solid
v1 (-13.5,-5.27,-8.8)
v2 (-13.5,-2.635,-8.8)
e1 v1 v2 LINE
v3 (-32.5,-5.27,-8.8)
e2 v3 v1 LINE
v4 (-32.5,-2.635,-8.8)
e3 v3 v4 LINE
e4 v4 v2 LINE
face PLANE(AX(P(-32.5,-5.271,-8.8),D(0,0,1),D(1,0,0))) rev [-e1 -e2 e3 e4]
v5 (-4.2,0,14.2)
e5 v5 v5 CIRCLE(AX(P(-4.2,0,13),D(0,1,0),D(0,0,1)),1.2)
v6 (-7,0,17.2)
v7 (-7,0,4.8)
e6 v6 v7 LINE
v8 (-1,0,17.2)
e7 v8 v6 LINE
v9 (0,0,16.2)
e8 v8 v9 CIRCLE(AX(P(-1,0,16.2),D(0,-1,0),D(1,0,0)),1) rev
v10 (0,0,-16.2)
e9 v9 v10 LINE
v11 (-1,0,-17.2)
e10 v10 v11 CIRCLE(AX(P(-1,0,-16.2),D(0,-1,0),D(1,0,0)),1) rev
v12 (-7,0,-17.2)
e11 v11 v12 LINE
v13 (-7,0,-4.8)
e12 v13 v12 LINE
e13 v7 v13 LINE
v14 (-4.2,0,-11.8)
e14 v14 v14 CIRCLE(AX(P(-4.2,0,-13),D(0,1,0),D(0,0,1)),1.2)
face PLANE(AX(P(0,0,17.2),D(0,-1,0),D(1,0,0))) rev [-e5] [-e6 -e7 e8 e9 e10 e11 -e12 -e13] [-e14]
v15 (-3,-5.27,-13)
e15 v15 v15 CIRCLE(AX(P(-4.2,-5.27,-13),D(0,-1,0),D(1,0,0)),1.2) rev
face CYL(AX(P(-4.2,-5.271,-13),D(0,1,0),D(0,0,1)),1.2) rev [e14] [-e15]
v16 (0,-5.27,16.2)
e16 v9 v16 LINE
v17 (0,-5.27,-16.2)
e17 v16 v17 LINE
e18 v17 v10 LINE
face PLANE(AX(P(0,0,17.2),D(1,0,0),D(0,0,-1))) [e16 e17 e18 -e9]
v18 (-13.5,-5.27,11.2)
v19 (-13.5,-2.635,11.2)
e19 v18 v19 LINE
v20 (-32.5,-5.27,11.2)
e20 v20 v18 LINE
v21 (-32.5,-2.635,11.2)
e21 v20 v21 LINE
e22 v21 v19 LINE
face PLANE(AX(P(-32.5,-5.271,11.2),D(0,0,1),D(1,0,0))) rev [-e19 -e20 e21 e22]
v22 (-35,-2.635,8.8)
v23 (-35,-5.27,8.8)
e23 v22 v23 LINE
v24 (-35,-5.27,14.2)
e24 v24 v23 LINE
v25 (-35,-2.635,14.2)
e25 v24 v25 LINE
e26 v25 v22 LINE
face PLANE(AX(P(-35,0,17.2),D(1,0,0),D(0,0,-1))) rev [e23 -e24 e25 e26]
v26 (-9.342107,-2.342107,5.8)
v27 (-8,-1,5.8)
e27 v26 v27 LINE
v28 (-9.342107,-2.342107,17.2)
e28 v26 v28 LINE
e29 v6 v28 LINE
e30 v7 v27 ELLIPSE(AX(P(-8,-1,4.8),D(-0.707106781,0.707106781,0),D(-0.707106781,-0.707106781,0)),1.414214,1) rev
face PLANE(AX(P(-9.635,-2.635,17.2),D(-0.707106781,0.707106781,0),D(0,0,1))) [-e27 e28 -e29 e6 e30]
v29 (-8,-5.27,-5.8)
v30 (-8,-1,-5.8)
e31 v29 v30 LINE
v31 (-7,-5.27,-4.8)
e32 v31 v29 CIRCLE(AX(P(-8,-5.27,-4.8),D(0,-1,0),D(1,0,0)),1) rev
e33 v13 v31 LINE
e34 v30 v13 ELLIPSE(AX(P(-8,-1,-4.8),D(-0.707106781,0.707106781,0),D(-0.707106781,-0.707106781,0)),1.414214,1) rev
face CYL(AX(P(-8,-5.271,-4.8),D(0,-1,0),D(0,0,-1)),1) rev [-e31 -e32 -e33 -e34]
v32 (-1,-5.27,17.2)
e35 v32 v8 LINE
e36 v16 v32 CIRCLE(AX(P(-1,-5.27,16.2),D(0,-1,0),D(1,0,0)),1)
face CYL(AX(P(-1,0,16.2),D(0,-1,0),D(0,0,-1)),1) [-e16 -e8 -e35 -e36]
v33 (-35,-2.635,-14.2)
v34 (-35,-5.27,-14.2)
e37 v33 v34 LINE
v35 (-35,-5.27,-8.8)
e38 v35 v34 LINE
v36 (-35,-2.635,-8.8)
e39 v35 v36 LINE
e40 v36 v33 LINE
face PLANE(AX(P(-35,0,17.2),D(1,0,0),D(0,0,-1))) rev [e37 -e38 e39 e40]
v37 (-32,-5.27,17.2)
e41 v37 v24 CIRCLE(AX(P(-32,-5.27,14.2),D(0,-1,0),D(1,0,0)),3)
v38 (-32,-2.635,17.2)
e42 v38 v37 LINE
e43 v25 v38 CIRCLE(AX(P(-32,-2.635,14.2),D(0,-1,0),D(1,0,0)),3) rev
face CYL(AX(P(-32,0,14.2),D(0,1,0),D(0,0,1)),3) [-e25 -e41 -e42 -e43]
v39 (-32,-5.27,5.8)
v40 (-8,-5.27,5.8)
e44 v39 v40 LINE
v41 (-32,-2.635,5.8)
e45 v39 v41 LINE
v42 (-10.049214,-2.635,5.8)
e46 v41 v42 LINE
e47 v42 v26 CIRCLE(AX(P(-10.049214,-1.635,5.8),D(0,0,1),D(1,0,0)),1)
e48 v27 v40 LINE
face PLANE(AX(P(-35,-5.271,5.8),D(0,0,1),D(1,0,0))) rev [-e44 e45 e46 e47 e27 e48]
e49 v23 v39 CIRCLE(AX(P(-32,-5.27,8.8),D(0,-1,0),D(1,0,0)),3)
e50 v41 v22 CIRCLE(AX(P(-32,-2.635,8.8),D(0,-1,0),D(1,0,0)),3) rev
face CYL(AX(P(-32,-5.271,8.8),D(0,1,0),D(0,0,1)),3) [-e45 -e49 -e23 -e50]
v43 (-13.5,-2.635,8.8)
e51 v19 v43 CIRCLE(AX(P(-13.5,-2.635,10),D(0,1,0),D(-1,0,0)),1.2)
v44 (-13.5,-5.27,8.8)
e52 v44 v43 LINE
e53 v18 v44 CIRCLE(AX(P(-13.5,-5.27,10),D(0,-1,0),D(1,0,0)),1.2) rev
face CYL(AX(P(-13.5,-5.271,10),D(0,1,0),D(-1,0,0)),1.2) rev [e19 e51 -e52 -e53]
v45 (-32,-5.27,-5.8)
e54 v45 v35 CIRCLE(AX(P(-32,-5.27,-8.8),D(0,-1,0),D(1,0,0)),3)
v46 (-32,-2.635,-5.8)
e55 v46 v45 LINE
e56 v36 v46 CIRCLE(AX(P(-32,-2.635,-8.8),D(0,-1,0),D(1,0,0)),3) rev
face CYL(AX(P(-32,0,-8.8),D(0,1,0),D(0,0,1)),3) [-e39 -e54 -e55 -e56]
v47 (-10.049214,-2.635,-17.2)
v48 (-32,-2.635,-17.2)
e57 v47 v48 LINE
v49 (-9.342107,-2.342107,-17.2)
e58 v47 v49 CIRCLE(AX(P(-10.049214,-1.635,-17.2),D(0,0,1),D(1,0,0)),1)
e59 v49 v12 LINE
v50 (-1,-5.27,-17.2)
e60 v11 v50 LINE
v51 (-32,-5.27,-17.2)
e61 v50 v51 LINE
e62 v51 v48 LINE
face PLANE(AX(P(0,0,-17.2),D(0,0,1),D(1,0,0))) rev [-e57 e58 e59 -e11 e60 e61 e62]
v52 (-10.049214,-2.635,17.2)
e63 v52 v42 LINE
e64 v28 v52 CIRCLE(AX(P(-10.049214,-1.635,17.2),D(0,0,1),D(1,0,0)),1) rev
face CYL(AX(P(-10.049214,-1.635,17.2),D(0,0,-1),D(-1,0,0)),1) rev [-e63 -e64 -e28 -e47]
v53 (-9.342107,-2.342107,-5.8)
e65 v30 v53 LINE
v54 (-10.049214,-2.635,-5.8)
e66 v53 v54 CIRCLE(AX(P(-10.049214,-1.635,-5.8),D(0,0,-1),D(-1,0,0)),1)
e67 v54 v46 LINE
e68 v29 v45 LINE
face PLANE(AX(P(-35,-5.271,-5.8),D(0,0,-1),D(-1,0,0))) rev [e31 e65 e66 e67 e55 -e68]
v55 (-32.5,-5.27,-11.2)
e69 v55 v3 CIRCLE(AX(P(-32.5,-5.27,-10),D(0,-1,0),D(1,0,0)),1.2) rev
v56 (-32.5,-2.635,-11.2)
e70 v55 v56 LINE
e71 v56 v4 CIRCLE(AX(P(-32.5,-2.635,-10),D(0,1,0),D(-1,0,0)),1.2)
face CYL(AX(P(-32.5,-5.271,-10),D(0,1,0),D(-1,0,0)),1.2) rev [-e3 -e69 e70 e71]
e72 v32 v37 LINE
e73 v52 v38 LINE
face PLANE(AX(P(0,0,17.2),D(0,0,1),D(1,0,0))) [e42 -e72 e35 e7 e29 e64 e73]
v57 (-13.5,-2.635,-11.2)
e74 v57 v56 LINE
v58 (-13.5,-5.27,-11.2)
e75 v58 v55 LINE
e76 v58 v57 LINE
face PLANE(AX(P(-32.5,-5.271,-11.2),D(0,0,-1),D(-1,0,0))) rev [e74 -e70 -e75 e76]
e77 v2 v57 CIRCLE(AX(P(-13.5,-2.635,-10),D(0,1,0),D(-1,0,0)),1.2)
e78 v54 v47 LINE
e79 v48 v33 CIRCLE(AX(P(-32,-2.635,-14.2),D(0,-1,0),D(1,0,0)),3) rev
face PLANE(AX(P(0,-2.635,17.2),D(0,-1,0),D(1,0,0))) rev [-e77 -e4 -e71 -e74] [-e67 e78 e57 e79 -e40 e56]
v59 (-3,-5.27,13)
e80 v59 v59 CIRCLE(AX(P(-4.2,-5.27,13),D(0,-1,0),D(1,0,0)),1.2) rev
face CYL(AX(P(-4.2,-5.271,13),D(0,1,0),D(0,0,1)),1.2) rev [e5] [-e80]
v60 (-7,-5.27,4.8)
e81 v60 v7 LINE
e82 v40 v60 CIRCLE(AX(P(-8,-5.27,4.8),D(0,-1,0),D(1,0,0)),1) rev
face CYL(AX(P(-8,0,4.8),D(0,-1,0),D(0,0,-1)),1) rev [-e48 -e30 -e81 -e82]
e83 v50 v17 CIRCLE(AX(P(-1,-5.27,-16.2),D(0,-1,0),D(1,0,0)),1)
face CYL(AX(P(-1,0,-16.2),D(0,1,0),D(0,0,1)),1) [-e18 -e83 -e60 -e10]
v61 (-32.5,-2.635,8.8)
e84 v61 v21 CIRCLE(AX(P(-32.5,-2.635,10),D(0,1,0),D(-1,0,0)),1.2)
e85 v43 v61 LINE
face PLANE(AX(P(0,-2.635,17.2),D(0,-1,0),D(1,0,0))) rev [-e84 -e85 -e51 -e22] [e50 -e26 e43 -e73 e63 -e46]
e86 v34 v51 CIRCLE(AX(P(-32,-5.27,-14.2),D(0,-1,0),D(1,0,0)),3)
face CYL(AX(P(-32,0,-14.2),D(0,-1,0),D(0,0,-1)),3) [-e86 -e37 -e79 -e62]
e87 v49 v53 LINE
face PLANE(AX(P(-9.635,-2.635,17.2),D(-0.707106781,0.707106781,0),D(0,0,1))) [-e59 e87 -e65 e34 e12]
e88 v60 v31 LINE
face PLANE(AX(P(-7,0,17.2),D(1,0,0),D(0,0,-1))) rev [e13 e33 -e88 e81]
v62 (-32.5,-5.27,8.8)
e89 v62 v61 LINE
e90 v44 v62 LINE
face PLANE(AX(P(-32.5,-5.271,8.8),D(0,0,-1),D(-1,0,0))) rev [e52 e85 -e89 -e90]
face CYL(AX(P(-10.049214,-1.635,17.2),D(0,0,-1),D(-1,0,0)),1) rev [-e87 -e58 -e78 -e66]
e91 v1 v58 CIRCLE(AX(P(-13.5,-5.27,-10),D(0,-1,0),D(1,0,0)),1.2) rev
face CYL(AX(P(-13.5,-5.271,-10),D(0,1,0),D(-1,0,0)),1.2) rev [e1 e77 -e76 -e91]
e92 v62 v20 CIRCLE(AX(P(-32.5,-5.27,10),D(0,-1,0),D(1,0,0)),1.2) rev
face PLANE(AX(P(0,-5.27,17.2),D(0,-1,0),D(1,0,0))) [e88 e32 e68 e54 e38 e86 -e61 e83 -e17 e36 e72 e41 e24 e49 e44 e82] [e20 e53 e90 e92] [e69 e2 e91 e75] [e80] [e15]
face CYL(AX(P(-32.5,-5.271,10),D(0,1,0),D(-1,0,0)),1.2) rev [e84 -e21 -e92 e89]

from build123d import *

# Parameters (mm, degrees)
SKETCH1_W           = 7
SKETCH1_H           = 2.635
BOSS_EXTRUDE1_DEPTH = 17.2
CUT_EXTRUDE1_REACH  = 41.352
SKETCH2_R           = 1.2
CUT_EXTRUDE2_REACH  = 41.087
SKETCH3_W           = 28
SKETCH3_H           = 11.6
CHAMFER1_SIZE       = 2.635
FILLET2_R           = 1
FILLET3_R           = 3
FILLET4_R           = 1


with BuildPart() as part:
    # Sketch1 → Boss-Extrude1 (new, symmetric)
    with BuildSketch(Plane.XY):
        Polygon((0, -5.27), (0, -2.635), (-7, -2.635), (-35, -2.635), (-35, -5.27), align=None)
        with Locations((-3.5, -1.3175)):
            Rectangle(SKETCH1_W, SKETCH1_H)
    extrude(amount=BOSS_EXTRUDE1_DEPTH, both=True)

    # Sketch2 → Cut-Extrude1 (cut, up to next)
    with BuildSketch(Plane(origin=(0, 0, 0), x_dir=(1, 0, 0), z_dir=(0, 1, 0)), mode=Mode.PRIVATE) as cut_extrude1_sk1:
        with Locations(Location((-4.2, 13, 0), (0, 0, 270))):
            Circle(SKETCH2_R)
    cut_extrude1_tool1 = extrude(cut_extrude1_sk1.sketch, amount=-CUT_EXTRUDE1_REACH, mode=Mode.PRIVATE) & part.part
    # Sketch2 → Cut-Extrude1 (cut, up to next)
    with BuildSketch(Plane(origin=(0, 0, 0), x_dir=(1, 0, 0), z_dir=(0, 1, 0)), mode=Mode.PRIVATE) as cut_extrude1_sk2:
        with Locations(Location((-4.2, -13, 0), (0, 0, 270))):
            Circle(SKETCH2_R)
    cut_extrude1_tool2 = extrude(cut_extrude1_sk2.sketch, amount=-CUT_EXTRUDE1_REACH, mode=Mode.PRIVATE) & part.part
    add(cut_extrude1_tool1.solids().sort_by_distance((-4.2, 0, -13))[0], mode=Mode.SUBTRACT)
    add(cut_extrude1_tool2.solids().sort_by_distance((-4.2, 0, 13))[0], mode=Mode.SUBTRACT)

    # Sketch3 → Cut-Extrude2 (cut, up to next)
    with BuildSketch(Plane(origin=(0, -2.635, 0), x_dir=(1, 0, 0), z_dir=(0, 1, 0)), mode=Mode.PRIVATE) as cut_extrude2_sk1:
        with Locations((-21, 0)):
            Rectangle(SKETCH3_W, SKETCH3_H)
    cut_extrude2_tool1 = extrude(cut_extrude2_sk1.sketch, amount=-CUT_EXTRUDE2_REACH, mode=Mode.PRIVATE) & part.part
    # Sketch3 → Cut-Extrude2 (cut, up to next)
    with BuildSketch(Plane(origin=(0, -2.635, 0), x_dir=(1, 0, 0), z_dir=(0, 1, 0)), mode=Mode.PRIVATE) as cut_extrude2_sk2:
        with BuildLine():
            Line((-32.5, 11.2), (-13.5, 11.2))
            ThreePointArc((-13.5, 11.2), (-12.3, 10), (-13.5, 8.8))
            Line((-13.5, 8.8), (-32.5, 8.8))
            ThreePointArc((-32.5, 8.8), (-33.7, 10), (-32.5, 11.2))
        make_face()
    cut_extrude2_tool2 = extrude(cut_extrude2_sk2.sketch, amount=-CUT_EXTRUDE2_REACH, mode=Mode.PRIVATE) & part.part
    # Sketch3 → Cut-Extrude2 (cut, up to next)
    with BuildSketch(Plane(origin=(0, -2.635, 0), x_dir=(1, 0, 0), z_dir=(0, 1, 0)), mode=Mode.PRIVATE) as cut_extrude2_sk3:
        with BuildLine():
            Line((-32.5, -8.8), (-13.5, -8.8))
            ThreePointArc((-13.5, -8.8), (-12.3, -10), (-13.5, -11.2))
            Line((-13.5, -11.2), (-32.5, -11.2))
            ThreePointArc((-32.5, -11.2), (-33.7, -10), (-32.5, -8.8))
        make_face()
    cut_extrude2_tool3 = extrude(cut_extrude2_sk3.sketch, amount=-CUT_EXTRUDE2_REACH, mode=Mode.PRIVATE) & part.part
    add(cut_extrude2_tool1.solids().sort_by_distance((-21, -2.635, 0))[0], mode=Mode.SUBTRACT)
    add(cut_extrude2_tool2.solids().sort_by_distance((-23, -2.635, -10))[0], mode=Mode.SUBTRACT)
    add(cut_extrude2_tool3.solids().sort_by_distance((-23, -2.635, 10))[0], mode=Mode.SUBTRACT)

    # Chamfer1
    # the kernel refuses this chamfer: 2.635 mm, written as the material it adds along each edge
    with BuildSketch(Plane(origin=(-7, -2.635, 5.8), x_dir=(0.027495876610586358, 0.9996219169112968, 0), z_dir=(0, 0, 1))) as chamfer1_piece_1_section:
        Polygon((CHAMFER1_SIZE * 0.999621916911, CHAMFER1_SIZE * 0.0274958766106), (-CHAMFER1_SIZE * 0.0274958766106, CHAMFER1_SIZE * 0.999621916911), (0, 0), align=None)
    chamfer1_piece_1 = extrude(amount=11.4, mode=Mode.PRIVATE)
    chamfer1_piece_1 = split(chamfer1_piece_1, bisect_by=Plane(origin=(-7.870614947, 0, 11.5), z_dir=(0, -1, 0)), keep=Keep.TOP, mode=Mode.PRIVATE)
    add(chamfer1_piece_1)
    with BuildSketch(Plane(origin=(-7, -2.635, -17.2), x_dir=(0.027495876610586358, 0.9996219169112968, 0), z_dir=(0, 0, 1))) as chamfer1_piece_2_section:
        Polygon((CHAMFER1_SIZE * 0.999621916911, CHAMFER1_SIZE * 0.0274958766106), (-CHAMFER1_SIZE * 0.0274958766106, CHAMFER1_SIZE * 0.999621916911), (0, 0), align=None)
    chamfer1_piece_2 = extrude(amount=11.4, mode=Mode.PRIVATE)
    chamfer1_piece_2 = split(chamfer1_piece_2, bisect_by=Plane(origin=(-7.870614947, 0, -11.5), z_dir=(0, -1, 0)), keep=Keep.TOP, mode=Mode.PRIVATE)
    add(chamfer1_piece_2)

    # Fillet2
    fillet2_edges = [part.edges().sort_by_distance(p)[0] for p in [
        (-7, -2.635, -5.8),
        (-7, -2.635, 5.8),
        (-9.635, -2.635, 11.5),
        (-9.635, -2.635, -11.5),
    ]]
    fillet(fillet2_edges, radius=FILLET2_R)

    # Fillet3
    fillet3_edges = [part.edges().sort_by_distance(p)[0] for p in [
        (-35, -3.9525, -17.2),
        (-35, -3.9525, 17.2),
        (-35, -3.9525, 5.8),
        (-35, -3.9525, -5.8),
    ]]
    fillet(fillet3_edges, radius=FILLET3_R)

    # Fillet4
    fillet4_edges = [part.edges().sort_by_distance(p)[0] for p in [
        (0, -2.635, 17.2),
        (0, -2.635, -17.2),
    ]]
    fillet(fillet4_edges, radius=FILLET4_R)


solid = part.part
